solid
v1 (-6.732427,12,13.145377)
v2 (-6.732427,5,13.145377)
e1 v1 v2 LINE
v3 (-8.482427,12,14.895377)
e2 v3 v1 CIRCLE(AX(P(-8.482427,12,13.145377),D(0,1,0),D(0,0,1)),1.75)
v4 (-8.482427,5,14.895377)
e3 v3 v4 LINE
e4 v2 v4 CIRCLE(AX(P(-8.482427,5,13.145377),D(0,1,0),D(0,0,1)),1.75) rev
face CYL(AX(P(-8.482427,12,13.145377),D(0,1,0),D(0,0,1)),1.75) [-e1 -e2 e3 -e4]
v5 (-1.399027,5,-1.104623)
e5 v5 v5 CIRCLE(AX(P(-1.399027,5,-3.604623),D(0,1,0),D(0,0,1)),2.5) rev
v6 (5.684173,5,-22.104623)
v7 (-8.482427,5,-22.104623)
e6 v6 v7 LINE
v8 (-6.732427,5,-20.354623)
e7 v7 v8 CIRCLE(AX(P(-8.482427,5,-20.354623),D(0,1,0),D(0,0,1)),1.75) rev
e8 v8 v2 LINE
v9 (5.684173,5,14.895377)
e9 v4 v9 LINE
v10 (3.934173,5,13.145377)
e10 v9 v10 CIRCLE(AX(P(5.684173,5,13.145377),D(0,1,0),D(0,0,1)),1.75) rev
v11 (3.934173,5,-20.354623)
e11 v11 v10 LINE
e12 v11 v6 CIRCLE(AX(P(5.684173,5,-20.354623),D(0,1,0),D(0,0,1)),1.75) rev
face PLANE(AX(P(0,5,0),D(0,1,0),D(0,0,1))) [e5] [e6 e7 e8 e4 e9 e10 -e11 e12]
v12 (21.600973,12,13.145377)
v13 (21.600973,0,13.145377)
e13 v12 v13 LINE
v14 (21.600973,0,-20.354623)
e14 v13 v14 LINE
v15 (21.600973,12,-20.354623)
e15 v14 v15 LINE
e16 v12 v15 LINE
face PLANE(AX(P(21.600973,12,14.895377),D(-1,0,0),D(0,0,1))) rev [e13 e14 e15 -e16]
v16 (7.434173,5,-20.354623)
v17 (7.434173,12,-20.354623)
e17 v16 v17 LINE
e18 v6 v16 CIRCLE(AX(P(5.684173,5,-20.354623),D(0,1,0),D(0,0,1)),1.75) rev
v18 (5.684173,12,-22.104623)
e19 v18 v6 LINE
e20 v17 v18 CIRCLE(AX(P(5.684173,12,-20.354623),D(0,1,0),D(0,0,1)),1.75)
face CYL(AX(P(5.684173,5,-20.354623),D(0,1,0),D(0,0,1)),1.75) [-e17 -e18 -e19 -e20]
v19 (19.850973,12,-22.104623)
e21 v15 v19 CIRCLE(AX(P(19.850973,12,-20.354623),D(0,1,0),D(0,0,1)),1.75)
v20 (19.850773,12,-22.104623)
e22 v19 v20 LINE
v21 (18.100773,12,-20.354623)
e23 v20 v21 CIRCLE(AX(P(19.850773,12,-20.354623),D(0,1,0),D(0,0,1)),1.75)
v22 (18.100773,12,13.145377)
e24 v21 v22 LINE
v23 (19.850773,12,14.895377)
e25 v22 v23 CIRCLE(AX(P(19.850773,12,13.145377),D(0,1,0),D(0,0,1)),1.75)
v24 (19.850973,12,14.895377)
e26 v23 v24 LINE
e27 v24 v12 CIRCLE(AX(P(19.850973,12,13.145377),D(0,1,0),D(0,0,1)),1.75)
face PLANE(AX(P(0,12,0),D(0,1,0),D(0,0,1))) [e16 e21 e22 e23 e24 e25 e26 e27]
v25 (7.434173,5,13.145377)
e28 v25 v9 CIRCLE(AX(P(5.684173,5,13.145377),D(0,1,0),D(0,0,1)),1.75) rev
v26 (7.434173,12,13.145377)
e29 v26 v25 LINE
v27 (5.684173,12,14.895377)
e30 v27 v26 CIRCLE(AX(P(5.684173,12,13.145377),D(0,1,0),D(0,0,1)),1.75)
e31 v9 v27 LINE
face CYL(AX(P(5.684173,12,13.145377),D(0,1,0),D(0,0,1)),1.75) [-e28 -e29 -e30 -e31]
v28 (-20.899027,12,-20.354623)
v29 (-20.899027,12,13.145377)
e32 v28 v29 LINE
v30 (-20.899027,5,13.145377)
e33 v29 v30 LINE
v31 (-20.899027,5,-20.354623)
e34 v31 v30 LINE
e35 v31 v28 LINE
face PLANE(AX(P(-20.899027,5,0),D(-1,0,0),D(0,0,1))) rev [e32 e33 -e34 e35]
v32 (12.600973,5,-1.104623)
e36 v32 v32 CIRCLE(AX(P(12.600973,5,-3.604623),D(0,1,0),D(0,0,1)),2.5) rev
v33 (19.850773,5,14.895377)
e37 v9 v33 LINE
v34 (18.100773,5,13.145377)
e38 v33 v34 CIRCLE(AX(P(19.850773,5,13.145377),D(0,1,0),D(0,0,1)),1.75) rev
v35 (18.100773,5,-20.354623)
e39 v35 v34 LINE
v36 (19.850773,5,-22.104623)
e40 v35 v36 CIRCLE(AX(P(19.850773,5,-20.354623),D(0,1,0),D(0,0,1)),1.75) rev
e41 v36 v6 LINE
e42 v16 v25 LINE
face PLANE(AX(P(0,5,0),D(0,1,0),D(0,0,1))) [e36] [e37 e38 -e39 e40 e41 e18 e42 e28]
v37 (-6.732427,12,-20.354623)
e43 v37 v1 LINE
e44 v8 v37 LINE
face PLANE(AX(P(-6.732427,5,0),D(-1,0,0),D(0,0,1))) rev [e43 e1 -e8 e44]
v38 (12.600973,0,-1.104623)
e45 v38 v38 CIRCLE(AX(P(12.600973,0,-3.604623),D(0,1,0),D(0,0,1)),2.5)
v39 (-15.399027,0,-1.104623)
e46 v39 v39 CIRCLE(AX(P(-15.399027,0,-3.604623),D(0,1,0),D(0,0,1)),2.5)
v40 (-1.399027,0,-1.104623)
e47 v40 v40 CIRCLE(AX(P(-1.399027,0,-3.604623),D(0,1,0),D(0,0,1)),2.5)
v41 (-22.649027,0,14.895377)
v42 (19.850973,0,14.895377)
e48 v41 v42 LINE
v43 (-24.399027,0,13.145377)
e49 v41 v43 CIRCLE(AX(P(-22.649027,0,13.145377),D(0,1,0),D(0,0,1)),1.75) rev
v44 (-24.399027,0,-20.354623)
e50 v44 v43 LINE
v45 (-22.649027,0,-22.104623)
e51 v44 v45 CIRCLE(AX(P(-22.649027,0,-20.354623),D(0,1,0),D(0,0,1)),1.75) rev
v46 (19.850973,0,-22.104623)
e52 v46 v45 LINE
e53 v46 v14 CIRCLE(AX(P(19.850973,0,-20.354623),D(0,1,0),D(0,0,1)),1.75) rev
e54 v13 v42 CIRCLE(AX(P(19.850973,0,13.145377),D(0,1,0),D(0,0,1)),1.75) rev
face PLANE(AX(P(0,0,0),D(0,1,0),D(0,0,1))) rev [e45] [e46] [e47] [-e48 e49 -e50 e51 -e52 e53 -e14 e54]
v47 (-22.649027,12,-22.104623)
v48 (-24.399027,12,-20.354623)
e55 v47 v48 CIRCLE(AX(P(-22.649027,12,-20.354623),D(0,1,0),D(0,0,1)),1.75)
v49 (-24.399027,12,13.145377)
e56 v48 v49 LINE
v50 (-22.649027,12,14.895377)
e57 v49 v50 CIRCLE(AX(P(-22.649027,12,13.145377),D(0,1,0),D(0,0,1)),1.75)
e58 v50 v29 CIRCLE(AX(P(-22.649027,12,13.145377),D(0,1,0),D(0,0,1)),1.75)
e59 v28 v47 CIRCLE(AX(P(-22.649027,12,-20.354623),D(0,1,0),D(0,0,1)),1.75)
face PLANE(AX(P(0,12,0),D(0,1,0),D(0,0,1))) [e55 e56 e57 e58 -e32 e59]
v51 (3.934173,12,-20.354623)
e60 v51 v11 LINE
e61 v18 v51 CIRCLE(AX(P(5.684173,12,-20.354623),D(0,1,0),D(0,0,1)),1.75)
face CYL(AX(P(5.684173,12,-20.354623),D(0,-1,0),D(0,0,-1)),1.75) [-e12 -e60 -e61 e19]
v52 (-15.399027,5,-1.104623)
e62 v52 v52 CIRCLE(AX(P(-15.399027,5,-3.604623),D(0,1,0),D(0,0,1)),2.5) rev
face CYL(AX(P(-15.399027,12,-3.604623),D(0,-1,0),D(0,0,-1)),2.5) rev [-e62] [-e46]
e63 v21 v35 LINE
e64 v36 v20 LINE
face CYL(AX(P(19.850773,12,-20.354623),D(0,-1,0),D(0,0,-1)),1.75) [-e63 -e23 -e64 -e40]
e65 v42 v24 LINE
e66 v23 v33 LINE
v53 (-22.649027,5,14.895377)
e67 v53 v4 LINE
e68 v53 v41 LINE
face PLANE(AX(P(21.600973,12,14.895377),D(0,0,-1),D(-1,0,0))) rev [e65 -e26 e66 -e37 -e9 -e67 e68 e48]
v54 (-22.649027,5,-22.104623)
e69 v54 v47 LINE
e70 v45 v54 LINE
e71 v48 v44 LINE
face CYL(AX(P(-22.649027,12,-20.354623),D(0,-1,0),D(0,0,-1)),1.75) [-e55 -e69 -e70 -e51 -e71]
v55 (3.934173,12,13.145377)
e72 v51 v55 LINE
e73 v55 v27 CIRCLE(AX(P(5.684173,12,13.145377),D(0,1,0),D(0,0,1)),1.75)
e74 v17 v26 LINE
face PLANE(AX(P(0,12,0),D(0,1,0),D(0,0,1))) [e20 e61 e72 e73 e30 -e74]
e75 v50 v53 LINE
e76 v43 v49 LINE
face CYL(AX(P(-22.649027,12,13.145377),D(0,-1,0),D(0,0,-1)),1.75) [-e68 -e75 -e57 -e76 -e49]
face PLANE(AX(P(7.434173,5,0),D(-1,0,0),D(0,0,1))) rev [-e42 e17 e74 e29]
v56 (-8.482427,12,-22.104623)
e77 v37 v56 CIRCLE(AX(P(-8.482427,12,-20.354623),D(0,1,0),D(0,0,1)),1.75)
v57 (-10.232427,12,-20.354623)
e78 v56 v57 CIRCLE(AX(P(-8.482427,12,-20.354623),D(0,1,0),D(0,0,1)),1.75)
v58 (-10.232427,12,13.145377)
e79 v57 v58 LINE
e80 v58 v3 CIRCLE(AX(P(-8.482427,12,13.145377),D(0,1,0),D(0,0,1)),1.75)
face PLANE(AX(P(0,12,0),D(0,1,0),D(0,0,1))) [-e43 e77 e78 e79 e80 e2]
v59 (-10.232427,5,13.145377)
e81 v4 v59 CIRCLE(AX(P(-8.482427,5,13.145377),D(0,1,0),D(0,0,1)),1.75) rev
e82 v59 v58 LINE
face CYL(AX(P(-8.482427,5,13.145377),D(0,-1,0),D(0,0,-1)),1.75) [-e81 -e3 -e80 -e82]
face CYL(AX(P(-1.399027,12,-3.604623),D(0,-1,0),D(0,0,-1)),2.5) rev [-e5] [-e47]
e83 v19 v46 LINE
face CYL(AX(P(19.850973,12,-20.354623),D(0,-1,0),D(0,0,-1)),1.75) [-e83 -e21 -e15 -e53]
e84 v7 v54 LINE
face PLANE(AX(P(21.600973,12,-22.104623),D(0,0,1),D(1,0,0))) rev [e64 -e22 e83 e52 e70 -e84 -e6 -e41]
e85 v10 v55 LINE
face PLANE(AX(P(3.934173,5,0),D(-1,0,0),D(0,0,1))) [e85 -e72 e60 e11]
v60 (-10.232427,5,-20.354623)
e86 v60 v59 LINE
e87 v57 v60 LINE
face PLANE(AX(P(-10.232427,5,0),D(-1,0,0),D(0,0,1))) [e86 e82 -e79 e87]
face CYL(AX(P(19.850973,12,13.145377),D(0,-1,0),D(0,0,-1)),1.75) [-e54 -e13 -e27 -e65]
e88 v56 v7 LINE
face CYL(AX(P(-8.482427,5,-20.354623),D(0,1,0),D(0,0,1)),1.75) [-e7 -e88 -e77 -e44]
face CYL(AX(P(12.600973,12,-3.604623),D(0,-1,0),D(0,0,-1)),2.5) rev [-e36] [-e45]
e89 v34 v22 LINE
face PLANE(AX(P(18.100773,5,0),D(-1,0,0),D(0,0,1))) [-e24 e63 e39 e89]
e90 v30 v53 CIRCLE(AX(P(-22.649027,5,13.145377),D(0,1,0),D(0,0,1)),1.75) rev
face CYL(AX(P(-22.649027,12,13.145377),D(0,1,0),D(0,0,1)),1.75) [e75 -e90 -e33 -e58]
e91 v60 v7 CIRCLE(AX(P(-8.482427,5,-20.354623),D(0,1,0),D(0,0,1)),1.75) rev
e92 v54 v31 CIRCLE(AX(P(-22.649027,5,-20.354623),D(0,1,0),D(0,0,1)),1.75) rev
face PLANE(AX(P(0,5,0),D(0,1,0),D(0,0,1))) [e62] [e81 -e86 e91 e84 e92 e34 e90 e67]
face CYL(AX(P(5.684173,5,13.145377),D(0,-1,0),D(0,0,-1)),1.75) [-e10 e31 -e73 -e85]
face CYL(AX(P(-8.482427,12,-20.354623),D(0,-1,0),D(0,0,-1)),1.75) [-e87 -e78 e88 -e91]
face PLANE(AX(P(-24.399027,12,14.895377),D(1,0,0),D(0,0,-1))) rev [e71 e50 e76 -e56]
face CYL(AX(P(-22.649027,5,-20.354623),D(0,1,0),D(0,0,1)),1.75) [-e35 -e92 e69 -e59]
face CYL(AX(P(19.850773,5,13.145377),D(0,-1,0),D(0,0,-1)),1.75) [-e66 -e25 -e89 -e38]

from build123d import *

# Parameters (mm, degrees)
SKETCH1_W           = 46
SKETCH1_H           = 37
SKETCH1_R           = 2.5
BOSS_EXTRUDE1_DEPTH = 12
CUT_EXTRUDE1_START  = -7
SKETCH2_W           = 10.6666
SKETCH2_H           = 37
SKETCH2_R           = 2.5
CUT_EXTRUDE1_DEPTH  = 7
FILLET1_R           = 1.75


with BuildPart() as part:
    # Sketch1 → Boss-Extrude1 (new body)
    with BuildSketch(Plane(origin=(0, 0, 0), x_dir=(1, 0, 0), z_dir=(0, 1, 0))):
        with Locations((-1.399026764, 3.604622871)):
            Rectangle(SKETCH1_W, SKETCH1_H)
        with Locations(Location((-1.399026764, 3.604622871, 0), (0, 0, 270))):
            Circle(SKETCH1_R, mode=Mode.SUBTRACT)
        with Locations(Location((-15.399026764, 3.604622871, 0), (0, 0, 270))):
            Circle(SKETCH1_R, mode=Mode.SUBTRACT)
        with Locations(Location((12.600973236, 3.604622871, 0), (0, 0, 270))):
            Circle(SKETCH1_R, mode=Mode.SUBTRACT)
    extrude(amount=BOSS_EXTRUDE1_DEPTH)

    # Sketch2 → Cut-Extrude1 (cut)
    # profile 1 of 3: a face of its own
    with BuildSketch(Plane(origin=(0, 12, 0), x_dir=(1, 0, 0), z_dir=(0, 1, 0)).offset(CUT_EXTRUDE1_START)):
        with Locations((-15.565726764, 3.604622871)):
            Rectangle(SKETCH2_W, SKETCH2_H)
        with Locations(Location((-15.399026764, 3.604622871, 0), (0, 0, 270))):
            Circle(SKETCH2_R, mode=Mode.SUBTRACT)
    # profile 2 of 3: a face of its own
    with BuildSketch(Plane(origin=(0, 12, 0), x_dir=(1, 0, 0), z_dir=(0, 1, 0)).offset(CUT_EXTRUDE1_START)):
        with Locations((-1.399126764, 3.604622871)):
            Rectangle(SKETCH2_W, SKETCH2_H)
        with Locations(Location((-1.399026764, 3.604622871, 0), (0, 0, 270))):
            Circle(SKETCH2_R, mode=Mode.SUBTRACT)
    # profile 3 of 3: a face of its own
    with BuildSketch(Plane(origin=(0, 12, 0), x_dir=(1, 0, 0), z_dir=(0, 1, 0)).offset(CUT_EXTRUDE1_START)):
        with Locations((12.767473236, 3.604622871)):
            Rectangle(SKETCH2_W, SKETCH2_H)
        with Locations(Location((12.600973236, 3.604622871, 0), (0, 0, 270))):
            Circle(SKETCH2_R, mode=Mode.SUBTRACT)
    extrude(amount=CUT_EXTRUDE1_DEPTH, mode=Mode.SUBTRACT)

    # Fillet1
    fillet1_edges = [part.edges().sort_by_distance(p)[0] for p in [
        (-10.232426764, 8.5, -22.104622871),
        (-10.232426764, 8.5, 14.895377129),
        (-20.899026764, 8.5, 14.895377129),
        (-20.899026764, 8.5, -22.104622871),
        (3.934173236, 8.5, -22.104622871),
        (3.934173236, 8.5, 14.895377129),
        (-6.732426764, 8.5, 14.895377129),
        (-6.732426764, 8.5, -22.104622871),
        (18.100773236, 8.5, -22.104622871),
        (18.100773236, 8.5, 14.895377129),
        (7.434173236, 8.5, 14.895377129),
        (7.434173236, 8.5, -22.104622871),
        (21.600973236, 6, 14.895377129),
        (-24.399026764, 6, 14.895377129),
        (-24.399026764, 6, -22.104622871),
        (21.600973236, 6, -22.104622871),
    ]]
    fillet(fillet1_edges, radius=FILLET1_R - 0.0001)  # a hair under: the kernel refuses the full size


solid = part.part
